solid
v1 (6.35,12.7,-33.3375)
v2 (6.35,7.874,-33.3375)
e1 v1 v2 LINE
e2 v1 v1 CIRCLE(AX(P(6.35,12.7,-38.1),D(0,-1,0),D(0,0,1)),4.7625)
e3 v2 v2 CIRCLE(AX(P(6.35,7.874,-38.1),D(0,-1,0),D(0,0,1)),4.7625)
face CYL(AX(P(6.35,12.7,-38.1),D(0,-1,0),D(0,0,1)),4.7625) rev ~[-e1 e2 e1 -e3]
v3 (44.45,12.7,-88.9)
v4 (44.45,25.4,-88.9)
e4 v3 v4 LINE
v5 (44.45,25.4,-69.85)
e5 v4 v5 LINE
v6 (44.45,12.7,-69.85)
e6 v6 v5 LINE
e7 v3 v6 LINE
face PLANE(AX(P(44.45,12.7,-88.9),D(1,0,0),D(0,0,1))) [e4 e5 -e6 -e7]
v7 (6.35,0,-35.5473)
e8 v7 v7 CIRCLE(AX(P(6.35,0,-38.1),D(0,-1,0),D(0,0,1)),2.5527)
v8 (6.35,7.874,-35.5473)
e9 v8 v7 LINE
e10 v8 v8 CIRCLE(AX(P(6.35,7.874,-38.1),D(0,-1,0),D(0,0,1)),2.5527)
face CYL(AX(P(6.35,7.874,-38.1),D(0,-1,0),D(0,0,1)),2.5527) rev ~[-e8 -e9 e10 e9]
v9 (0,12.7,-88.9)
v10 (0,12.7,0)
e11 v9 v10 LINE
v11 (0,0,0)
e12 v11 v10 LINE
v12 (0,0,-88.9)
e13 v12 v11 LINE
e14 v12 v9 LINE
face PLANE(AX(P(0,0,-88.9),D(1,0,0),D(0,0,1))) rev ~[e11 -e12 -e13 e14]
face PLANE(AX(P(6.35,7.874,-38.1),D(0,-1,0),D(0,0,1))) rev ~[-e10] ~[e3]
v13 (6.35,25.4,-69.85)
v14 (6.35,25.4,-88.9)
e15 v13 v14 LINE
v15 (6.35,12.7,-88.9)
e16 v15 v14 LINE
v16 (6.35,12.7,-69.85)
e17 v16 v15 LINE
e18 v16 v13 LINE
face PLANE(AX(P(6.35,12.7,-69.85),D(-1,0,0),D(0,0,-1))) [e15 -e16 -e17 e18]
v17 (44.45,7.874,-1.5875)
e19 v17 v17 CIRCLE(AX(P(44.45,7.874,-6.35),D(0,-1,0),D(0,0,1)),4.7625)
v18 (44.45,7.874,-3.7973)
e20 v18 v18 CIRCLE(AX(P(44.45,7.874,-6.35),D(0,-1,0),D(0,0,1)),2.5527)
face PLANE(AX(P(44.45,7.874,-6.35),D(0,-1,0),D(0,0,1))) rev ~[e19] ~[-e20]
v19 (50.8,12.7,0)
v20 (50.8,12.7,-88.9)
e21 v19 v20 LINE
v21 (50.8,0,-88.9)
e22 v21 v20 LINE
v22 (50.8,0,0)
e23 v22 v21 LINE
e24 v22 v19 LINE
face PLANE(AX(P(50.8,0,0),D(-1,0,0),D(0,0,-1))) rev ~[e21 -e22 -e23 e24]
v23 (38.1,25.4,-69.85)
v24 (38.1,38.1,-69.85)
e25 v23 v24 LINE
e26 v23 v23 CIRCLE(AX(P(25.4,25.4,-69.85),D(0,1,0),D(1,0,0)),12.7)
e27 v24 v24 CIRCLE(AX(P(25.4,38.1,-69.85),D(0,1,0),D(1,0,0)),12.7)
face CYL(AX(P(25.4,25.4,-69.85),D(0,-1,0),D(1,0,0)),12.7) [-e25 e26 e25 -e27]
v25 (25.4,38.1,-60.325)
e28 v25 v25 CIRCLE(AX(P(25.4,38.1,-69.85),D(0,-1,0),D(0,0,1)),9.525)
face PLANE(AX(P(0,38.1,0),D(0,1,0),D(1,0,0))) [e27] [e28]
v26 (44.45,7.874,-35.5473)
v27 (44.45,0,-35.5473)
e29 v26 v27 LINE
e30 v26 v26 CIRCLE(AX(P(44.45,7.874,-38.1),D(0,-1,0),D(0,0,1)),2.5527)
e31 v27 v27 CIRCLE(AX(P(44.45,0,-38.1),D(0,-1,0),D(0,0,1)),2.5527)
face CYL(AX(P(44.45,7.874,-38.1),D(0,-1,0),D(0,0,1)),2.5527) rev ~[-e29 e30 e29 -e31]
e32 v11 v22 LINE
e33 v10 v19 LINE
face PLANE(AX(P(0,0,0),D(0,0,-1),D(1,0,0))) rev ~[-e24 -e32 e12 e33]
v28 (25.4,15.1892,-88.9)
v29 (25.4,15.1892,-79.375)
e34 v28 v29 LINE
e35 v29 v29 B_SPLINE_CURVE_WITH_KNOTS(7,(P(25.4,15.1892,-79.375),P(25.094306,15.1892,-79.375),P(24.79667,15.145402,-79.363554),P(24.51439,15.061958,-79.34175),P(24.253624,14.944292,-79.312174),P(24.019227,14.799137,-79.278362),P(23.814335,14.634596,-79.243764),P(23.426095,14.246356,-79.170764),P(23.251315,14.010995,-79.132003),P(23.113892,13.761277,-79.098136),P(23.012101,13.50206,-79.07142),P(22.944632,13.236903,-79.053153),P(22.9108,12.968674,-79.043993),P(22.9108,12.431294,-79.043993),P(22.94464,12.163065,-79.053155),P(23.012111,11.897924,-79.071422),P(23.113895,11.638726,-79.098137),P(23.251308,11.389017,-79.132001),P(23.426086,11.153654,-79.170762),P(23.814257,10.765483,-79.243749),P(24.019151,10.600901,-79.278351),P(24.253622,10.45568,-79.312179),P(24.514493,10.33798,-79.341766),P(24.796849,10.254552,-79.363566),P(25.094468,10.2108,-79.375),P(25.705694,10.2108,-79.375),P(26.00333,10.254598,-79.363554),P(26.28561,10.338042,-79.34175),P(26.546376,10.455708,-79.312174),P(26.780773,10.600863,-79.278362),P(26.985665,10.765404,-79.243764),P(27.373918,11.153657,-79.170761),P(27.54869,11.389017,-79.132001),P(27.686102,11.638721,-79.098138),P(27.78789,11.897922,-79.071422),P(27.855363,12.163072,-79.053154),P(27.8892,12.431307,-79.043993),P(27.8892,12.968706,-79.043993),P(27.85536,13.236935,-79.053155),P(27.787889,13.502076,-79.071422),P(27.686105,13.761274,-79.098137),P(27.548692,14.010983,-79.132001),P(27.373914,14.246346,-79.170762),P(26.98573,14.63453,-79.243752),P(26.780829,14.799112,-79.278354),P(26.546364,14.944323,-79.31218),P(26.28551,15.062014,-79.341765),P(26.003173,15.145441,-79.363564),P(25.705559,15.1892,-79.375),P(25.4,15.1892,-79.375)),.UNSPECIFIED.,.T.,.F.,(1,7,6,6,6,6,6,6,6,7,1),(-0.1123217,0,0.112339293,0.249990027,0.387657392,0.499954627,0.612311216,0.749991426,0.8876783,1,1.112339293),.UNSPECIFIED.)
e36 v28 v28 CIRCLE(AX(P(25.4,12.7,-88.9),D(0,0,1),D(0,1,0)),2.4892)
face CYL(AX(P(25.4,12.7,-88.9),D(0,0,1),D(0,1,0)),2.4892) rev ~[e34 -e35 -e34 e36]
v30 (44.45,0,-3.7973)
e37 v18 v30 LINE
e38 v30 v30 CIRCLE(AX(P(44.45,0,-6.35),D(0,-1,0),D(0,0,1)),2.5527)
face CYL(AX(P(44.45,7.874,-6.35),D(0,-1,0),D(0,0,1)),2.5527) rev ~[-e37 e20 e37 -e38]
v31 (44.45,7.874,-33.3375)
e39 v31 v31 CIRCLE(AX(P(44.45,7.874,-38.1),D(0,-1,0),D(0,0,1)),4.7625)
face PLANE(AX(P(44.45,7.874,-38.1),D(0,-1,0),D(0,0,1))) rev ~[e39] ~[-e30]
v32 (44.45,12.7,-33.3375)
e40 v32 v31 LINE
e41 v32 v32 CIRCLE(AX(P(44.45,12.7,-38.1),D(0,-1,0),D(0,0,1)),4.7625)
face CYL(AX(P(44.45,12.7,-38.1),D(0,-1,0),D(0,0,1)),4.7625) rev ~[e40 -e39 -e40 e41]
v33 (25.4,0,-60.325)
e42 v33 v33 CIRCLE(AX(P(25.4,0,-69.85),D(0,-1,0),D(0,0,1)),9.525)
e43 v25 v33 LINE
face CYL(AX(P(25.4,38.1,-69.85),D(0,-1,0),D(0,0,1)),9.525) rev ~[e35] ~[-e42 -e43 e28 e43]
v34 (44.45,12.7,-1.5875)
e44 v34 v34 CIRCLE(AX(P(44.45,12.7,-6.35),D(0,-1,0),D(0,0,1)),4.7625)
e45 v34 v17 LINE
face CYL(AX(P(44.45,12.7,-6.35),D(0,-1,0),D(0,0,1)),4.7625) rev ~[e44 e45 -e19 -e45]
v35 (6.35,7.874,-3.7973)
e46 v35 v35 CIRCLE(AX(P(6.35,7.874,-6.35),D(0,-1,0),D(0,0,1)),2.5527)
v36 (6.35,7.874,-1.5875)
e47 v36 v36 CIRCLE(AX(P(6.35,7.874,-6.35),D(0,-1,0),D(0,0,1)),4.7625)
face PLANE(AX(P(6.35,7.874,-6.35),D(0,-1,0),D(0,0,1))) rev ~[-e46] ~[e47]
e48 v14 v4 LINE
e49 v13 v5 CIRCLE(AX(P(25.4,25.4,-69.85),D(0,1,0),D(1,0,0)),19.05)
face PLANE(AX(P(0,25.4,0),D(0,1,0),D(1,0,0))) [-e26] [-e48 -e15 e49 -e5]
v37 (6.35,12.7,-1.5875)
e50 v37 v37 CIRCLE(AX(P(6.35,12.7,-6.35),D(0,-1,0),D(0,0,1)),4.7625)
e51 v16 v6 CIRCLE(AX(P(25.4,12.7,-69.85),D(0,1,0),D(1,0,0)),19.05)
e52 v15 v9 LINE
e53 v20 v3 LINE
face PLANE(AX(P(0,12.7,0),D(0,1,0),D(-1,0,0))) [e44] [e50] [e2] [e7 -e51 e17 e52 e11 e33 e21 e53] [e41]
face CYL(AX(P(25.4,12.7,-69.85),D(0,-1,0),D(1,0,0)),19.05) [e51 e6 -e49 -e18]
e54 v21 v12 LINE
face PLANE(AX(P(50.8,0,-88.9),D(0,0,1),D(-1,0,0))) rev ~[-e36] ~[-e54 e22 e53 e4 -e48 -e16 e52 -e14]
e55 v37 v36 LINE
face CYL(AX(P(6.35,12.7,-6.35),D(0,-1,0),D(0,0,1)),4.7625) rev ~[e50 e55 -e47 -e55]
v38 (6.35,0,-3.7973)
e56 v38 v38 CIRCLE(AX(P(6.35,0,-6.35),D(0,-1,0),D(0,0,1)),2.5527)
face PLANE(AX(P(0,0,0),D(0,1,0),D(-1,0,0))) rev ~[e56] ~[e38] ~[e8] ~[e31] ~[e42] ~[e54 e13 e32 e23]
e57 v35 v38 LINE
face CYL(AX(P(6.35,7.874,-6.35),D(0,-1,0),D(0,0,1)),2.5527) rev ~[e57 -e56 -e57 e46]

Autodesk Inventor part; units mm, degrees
ref_plane "YZ Plane" through (0, 0, 0) normal (1, 0, 0) x (0, 1, 0)
ref_plane "XZ Plane" through (0, 0, 0) normal (0, 1, 0) x (-1, 0, 0)
ref_plane "XY Plane" through (0, 0, 0) normal (0, 0, 1) x (1, 0, 0)
sketch "Sketch1" plane through (0, 0, 0) normal (0, 1, 0) x (-1, 0, 0)
  line L0 (0, 0) -> (-50.8, 0)
  line L1 (-50.8, 0) -> (-50.8, -88.9)
  line L2 (-50.8, -88.9) -> (0, -88.9)
  line L3 (0, -88.9) -> (0, 0)
  dimension "d0" = 50.8
  dimension "d1" = 88.9
extrude "Extrusion1" add sketch "Sketch1" along normal blind 12.7
sketch "Sketch2" plane through (0, 12.7, 0) normal (0, 1, 0) x (1, 0, 0)
  line L0 (50.8, 0) -> (50.8, 88.9) projected
  line L1 (50.8, 88.9) -> (0, 88.9) projected
  line L2 (0, 88.9) -> (0, 0) projected
  line L3 (6.35, 88.9) -> (44.45, 88.9)
  line L4 (44.45, 88.9) -> (44.45, 69.85)
  line L5 (44.45, 69.85) -> (6.35, 69.85)
  line L6 (6.35, 69.85) -> (6.35, 88.9)
  line L7 (6.35, 79.375) -> (0, 79.375) construction
  line L8 (44.45, 79.375) -> (50.8, 79.375) construction
  circle A0 centre (25.4, 69.85) radius 19.05
  dimension "d4" = 19.05
  dimension "d5" = 6.35
extrude "Extrusion2" add sketch "Sketch2" along normal blind 12.7
sketch "Sketch3" plane through (0, 25.4, 0) normal (0, 1, 0) x (1, 0, 0)
  arc A0 (6.35, 69.85) -> (44.45, 69.85) centre (25.4, 69.85) ccw projected
  circle A1 centre (25.4, 69.85) radius 12.7
  point P0 (0, 0)
  dimension "d8" = 25.4
extrude "Extrusion3" add sketch "Sketch3" along normal blind 12.7
sketch "Sketch6" plane through (0, 12.7, 0) normal (0, 1, 0) x (1, 0, 0)
  line L0 (0, 88.9) -> (0, 0) projected
  line L1 (0, 0) -> (50.8, 0) projected
  line L2 (50.8, 0) -> (50.8, 88.9) projected
  line L3 (44.45, 88.9) -> (44.45, 6.35) construction
  line L4 (44.45, 6.35) -> (6.35, 6.35) construction
  line L5 (6.35, 6.35) -> (6.35, 88.9) construction
  line L6 (6.35, 38.1) -> (44.45, 38.1) construction
  dimension "d35" = 6.35
  dimension "d36" = 31.75
hole "Hole3" at (25.4, 38.1, -69.85) direction (0, -1, 0) diameter 19.05 end through all
sketch "Sketch7" plane through (50.8, 0, -88.9) normal (0, 0, -1) x (-1, 0, 0)
  line L0 (0, 0) -> (0, 12.7) projected
  line L1 (44.45, 12.7) -> (6.35, 12.7) construction
  point P0 (25.4, 12.7)
hole "Hole4" at (25.4, 12.7, -88.9) direction (0, 0, 1) diameter 4.9784 end up to surface thread size "1/4-20 UNC" class "2B" standard "ANSI Unified Screw Threads"
hole "Hole5" at (6.35, 12.7, -6.35) at (6.35, 12.7, -38.1) at (44.45, 12.7, -6.35) at (44.45, 12.7, -38.1) direction (0, -1, 0) diameter 5.1054 end through all counterbore diameter 9.525 counterbore depth 4.826 clearance for "Socket Head Cap Screw" size "#10" standard "Ansi Unified Screw Threads"
properties part number "Holes Complete"
